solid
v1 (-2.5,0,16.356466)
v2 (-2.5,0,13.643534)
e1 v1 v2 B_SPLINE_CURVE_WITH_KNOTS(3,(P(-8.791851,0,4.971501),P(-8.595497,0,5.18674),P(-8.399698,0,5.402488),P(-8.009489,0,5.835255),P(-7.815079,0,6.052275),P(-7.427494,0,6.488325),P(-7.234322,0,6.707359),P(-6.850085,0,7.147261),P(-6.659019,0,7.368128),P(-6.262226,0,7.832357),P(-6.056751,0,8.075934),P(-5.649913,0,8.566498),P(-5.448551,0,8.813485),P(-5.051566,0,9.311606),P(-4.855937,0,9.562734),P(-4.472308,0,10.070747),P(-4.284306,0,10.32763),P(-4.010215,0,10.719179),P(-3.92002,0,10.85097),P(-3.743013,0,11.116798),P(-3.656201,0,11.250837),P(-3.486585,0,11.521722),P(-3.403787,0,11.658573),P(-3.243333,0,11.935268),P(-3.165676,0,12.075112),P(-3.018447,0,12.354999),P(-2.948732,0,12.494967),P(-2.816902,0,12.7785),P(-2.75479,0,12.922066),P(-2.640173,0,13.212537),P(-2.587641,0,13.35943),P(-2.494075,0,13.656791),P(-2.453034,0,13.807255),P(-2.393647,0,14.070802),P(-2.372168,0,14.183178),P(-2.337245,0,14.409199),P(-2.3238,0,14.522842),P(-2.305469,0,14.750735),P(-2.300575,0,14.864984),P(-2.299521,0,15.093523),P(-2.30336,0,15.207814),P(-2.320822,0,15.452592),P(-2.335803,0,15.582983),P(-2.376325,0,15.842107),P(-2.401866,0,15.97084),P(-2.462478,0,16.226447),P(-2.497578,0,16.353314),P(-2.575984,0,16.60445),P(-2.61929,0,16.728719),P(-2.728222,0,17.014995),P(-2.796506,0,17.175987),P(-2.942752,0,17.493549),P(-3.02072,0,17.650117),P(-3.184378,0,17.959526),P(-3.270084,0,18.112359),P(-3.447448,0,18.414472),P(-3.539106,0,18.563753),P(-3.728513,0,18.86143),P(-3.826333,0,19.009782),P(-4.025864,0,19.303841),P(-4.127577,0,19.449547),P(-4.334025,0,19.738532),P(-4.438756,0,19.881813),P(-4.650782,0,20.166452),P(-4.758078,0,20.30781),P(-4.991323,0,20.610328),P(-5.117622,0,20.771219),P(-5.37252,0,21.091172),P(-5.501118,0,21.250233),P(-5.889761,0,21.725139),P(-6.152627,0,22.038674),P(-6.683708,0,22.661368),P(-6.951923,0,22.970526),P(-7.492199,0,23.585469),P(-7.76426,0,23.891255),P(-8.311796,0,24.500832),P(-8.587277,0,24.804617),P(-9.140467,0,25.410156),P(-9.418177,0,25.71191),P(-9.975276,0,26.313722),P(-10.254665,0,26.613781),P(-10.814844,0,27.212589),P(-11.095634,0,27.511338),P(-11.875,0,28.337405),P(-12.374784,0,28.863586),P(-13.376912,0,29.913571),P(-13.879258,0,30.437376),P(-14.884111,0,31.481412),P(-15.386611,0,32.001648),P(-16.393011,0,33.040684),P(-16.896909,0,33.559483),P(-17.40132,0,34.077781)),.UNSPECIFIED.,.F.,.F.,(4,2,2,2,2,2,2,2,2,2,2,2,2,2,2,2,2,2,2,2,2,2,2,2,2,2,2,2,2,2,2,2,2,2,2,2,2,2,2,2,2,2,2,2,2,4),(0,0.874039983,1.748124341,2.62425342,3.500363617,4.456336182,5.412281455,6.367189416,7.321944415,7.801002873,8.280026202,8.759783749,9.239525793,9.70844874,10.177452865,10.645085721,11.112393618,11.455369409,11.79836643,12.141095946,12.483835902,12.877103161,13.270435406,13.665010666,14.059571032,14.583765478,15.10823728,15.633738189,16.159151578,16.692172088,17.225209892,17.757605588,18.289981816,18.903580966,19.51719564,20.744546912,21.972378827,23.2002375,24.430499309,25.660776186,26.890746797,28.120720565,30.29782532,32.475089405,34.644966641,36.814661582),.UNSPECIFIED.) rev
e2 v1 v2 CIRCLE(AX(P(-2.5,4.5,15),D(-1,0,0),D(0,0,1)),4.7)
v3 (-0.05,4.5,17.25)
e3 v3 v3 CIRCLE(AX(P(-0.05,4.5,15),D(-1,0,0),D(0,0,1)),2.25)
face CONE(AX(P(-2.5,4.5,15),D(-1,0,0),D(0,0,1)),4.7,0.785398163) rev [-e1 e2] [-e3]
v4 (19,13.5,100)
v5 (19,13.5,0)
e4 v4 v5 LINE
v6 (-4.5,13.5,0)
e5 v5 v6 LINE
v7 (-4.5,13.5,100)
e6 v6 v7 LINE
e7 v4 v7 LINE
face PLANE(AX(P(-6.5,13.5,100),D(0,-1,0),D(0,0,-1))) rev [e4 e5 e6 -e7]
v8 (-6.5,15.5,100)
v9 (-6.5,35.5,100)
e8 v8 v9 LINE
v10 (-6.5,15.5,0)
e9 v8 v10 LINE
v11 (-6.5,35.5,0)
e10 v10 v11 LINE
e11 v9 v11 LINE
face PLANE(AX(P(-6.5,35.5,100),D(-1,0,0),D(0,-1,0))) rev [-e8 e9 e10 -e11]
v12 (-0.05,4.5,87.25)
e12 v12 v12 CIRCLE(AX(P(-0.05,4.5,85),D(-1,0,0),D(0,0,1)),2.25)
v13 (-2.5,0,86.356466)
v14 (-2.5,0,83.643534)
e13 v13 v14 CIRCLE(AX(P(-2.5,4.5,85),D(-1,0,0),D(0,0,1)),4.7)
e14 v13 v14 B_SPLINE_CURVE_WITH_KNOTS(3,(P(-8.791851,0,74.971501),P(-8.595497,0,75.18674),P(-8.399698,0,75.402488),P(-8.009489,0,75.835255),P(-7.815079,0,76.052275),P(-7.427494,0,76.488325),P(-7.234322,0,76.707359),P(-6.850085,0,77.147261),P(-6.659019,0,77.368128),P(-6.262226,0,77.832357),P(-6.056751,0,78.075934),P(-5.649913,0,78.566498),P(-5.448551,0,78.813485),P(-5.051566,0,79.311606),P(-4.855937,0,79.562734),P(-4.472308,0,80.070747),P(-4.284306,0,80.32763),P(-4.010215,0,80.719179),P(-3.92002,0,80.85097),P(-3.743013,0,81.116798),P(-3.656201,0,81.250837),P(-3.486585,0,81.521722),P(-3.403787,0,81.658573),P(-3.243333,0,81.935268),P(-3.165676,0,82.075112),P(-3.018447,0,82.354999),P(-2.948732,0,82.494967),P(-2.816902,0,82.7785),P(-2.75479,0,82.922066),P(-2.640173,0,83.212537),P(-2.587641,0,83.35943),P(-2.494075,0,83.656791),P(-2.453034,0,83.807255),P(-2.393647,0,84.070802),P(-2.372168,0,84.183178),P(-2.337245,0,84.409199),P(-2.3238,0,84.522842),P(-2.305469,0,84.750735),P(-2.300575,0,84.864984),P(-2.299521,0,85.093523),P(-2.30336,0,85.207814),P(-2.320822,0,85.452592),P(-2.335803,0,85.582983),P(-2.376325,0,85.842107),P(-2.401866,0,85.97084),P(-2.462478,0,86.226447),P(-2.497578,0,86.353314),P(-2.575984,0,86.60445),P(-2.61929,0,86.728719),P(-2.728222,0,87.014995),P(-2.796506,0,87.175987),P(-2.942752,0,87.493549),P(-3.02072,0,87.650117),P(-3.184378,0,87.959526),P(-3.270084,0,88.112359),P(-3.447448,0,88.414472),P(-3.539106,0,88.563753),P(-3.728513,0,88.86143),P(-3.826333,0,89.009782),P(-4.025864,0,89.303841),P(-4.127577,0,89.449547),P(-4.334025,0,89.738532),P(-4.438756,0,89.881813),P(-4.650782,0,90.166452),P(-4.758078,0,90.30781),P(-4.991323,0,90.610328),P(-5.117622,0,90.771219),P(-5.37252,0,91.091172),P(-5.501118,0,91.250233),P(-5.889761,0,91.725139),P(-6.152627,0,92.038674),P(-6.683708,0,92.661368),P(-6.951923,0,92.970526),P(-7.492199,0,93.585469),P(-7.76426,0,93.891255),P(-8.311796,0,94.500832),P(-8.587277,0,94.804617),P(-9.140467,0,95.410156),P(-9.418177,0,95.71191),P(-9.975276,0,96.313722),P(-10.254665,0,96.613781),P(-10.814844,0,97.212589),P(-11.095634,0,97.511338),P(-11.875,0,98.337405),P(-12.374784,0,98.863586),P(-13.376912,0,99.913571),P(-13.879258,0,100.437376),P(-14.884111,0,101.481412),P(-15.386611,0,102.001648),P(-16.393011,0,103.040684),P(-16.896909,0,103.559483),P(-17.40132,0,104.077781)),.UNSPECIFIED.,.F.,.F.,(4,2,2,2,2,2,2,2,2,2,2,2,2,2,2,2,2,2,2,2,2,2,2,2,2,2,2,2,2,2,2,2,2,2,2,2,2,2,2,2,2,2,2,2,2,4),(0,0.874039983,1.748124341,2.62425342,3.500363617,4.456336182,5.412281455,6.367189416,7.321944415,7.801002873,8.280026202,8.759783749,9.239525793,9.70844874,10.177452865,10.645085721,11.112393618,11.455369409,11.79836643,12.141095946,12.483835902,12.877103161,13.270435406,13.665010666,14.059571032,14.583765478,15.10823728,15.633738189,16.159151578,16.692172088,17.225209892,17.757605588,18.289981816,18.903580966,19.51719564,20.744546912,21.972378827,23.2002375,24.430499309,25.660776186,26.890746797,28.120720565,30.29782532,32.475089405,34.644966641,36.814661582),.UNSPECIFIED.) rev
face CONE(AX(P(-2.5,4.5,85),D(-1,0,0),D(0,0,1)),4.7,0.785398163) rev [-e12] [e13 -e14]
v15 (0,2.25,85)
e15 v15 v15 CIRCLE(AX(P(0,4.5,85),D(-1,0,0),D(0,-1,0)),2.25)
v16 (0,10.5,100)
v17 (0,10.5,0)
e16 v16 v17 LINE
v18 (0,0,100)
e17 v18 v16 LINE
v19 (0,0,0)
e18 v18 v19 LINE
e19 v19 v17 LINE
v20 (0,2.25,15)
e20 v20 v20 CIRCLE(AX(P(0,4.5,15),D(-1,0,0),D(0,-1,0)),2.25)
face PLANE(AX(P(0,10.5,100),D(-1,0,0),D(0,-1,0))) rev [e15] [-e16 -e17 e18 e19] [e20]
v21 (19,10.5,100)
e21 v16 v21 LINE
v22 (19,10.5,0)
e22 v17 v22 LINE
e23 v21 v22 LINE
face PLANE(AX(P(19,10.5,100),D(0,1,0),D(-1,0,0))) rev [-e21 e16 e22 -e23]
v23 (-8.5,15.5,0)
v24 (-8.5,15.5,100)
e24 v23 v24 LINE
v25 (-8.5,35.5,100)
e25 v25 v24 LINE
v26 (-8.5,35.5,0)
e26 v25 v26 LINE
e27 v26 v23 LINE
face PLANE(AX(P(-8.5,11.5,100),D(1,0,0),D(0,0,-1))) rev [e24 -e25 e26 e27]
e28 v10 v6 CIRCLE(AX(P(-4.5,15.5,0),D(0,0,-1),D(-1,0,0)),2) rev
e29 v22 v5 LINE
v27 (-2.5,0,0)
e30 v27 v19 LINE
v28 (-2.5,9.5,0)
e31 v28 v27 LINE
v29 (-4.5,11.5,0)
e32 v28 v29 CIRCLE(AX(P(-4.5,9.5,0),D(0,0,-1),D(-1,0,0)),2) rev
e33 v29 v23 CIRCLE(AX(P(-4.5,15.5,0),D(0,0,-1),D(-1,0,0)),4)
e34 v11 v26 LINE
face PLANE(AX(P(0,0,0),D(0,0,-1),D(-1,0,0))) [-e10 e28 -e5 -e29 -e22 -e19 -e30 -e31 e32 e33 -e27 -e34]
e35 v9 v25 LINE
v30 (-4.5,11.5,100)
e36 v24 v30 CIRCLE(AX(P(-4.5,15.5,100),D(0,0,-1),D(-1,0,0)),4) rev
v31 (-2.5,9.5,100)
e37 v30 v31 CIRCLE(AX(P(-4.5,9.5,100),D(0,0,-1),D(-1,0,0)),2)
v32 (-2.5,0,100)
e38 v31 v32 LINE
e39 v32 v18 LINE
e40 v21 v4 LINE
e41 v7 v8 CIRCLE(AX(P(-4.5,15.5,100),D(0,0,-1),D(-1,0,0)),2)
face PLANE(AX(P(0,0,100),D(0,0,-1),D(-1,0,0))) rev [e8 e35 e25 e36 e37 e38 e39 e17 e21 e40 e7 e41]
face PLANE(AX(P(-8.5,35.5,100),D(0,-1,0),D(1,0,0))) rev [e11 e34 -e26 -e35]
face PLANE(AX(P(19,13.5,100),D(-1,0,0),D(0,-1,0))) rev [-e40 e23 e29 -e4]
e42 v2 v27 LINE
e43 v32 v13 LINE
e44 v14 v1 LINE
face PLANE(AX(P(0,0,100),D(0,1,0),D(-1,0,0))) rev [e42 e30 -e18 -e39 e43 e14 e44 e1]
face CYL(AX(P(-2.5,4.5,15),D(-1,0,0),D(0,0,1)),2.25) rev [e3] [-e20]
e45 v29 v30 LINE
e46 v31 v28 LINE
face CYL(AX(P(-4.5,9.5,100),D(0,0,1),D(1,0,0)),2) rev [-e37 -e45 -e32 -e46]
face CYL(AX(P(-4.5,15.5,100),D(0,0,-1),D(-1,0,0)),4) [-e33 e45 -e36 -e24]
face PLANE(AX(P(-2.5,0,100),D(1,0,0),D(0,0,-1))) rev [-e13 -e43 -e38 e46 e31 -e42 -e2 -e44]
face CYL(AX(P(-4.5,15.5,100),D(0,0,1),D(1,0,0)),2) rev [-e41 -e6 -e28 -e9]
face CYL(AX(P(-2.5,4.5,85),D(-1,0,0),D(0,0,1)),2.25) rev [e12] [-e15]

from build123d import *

# Parameters (mm, degrees)
ESTRUSIONE_ESTRUSIONE1_DEPTH           = 100
RACCORDO1_R                            = 2
RACCORDO2_R                            = 4
FORO_SVASATO_PER_VITE_M4_1_D           = 4.5
FORO_SVASATO_PER_VITE_M4_1_DEPTH       = 188
FORO_SVASATO_PER_VITE_M4_1_CSINK_D     = 9.4
FORO_SVASATO_PER_VITE_M4_1_CSINK_ANGLE = 90
FORO_SVASATO_PER_VITE_M4_1_TIP         = 1.351936393


with BuildPart() as part:
    # Schizzo1 → Estrusione-Estrusione1 (new body)
    with BuildSketch(Plane.XY):
        Polygon((0, 0), (-2.5, 0), (-2.5, 11.5), (-8.5, 11.5), (-8.5, 35.5), (-6.5, 35.5), (-6.5, 13.5), (19, 13.5), (19, 10.5), (0, 10.5), align=None)
    extrude(amount=ESTRUSIONE_ESTRUSIONE1_DEPTH)

    # Raccordo1
    raccordo1_edges = [part.edges().sort_by_distance(p)[0] for p in [
        (-2.5, 11.5, 50),
        (-6.5, 13.5, 50),
    ]]
    fillet(raccordo1_edges, radius=RACCORDO1_R)

    # Raccordo2
    raccordo2_edges = [part.edges().sort_by_distance(p)[0] for p in [
        (-8.5, 11.5, 50),
    ]]
    fillet(raccordo2_edges, radius=RACCORDO2_R - 0.0001)  # a hair under: the kernel refuses the full size

    # Foro svasato per Vite M4-1
    with Locations(Plane.ZY.offset(2.5)):
        with Locations((85, 4.5), (15, 4.5)):
            CounterSinkHole(FORO_SVASATO_PER_VITE_M4_1_D / 2, FORO_SVASATO_PER_VITE_M4_1_CSINK_D / 2, depth=FORO_SVASATO_PER_VITE_M4_1_DEPTH, counter_sink_angle=FORO_SVASATO_PER_VITE_M4_1_CSINK_ANGLE)
            with Locations((0, 0, -(FORO_SVASATO_PER_VITE_M4_1_DEPTH + FORO_SVASATO_PER_VITE_M4_1_TIP / 2))):  # 118° drill point
                Cone(0, FORO_SVASATO_PER_VITE_M4_1_D / 2, FORO_SVASATO_PER_VITE_M4_1_TIP, mode=Mode.SUBTRACT)


solid = part.part
